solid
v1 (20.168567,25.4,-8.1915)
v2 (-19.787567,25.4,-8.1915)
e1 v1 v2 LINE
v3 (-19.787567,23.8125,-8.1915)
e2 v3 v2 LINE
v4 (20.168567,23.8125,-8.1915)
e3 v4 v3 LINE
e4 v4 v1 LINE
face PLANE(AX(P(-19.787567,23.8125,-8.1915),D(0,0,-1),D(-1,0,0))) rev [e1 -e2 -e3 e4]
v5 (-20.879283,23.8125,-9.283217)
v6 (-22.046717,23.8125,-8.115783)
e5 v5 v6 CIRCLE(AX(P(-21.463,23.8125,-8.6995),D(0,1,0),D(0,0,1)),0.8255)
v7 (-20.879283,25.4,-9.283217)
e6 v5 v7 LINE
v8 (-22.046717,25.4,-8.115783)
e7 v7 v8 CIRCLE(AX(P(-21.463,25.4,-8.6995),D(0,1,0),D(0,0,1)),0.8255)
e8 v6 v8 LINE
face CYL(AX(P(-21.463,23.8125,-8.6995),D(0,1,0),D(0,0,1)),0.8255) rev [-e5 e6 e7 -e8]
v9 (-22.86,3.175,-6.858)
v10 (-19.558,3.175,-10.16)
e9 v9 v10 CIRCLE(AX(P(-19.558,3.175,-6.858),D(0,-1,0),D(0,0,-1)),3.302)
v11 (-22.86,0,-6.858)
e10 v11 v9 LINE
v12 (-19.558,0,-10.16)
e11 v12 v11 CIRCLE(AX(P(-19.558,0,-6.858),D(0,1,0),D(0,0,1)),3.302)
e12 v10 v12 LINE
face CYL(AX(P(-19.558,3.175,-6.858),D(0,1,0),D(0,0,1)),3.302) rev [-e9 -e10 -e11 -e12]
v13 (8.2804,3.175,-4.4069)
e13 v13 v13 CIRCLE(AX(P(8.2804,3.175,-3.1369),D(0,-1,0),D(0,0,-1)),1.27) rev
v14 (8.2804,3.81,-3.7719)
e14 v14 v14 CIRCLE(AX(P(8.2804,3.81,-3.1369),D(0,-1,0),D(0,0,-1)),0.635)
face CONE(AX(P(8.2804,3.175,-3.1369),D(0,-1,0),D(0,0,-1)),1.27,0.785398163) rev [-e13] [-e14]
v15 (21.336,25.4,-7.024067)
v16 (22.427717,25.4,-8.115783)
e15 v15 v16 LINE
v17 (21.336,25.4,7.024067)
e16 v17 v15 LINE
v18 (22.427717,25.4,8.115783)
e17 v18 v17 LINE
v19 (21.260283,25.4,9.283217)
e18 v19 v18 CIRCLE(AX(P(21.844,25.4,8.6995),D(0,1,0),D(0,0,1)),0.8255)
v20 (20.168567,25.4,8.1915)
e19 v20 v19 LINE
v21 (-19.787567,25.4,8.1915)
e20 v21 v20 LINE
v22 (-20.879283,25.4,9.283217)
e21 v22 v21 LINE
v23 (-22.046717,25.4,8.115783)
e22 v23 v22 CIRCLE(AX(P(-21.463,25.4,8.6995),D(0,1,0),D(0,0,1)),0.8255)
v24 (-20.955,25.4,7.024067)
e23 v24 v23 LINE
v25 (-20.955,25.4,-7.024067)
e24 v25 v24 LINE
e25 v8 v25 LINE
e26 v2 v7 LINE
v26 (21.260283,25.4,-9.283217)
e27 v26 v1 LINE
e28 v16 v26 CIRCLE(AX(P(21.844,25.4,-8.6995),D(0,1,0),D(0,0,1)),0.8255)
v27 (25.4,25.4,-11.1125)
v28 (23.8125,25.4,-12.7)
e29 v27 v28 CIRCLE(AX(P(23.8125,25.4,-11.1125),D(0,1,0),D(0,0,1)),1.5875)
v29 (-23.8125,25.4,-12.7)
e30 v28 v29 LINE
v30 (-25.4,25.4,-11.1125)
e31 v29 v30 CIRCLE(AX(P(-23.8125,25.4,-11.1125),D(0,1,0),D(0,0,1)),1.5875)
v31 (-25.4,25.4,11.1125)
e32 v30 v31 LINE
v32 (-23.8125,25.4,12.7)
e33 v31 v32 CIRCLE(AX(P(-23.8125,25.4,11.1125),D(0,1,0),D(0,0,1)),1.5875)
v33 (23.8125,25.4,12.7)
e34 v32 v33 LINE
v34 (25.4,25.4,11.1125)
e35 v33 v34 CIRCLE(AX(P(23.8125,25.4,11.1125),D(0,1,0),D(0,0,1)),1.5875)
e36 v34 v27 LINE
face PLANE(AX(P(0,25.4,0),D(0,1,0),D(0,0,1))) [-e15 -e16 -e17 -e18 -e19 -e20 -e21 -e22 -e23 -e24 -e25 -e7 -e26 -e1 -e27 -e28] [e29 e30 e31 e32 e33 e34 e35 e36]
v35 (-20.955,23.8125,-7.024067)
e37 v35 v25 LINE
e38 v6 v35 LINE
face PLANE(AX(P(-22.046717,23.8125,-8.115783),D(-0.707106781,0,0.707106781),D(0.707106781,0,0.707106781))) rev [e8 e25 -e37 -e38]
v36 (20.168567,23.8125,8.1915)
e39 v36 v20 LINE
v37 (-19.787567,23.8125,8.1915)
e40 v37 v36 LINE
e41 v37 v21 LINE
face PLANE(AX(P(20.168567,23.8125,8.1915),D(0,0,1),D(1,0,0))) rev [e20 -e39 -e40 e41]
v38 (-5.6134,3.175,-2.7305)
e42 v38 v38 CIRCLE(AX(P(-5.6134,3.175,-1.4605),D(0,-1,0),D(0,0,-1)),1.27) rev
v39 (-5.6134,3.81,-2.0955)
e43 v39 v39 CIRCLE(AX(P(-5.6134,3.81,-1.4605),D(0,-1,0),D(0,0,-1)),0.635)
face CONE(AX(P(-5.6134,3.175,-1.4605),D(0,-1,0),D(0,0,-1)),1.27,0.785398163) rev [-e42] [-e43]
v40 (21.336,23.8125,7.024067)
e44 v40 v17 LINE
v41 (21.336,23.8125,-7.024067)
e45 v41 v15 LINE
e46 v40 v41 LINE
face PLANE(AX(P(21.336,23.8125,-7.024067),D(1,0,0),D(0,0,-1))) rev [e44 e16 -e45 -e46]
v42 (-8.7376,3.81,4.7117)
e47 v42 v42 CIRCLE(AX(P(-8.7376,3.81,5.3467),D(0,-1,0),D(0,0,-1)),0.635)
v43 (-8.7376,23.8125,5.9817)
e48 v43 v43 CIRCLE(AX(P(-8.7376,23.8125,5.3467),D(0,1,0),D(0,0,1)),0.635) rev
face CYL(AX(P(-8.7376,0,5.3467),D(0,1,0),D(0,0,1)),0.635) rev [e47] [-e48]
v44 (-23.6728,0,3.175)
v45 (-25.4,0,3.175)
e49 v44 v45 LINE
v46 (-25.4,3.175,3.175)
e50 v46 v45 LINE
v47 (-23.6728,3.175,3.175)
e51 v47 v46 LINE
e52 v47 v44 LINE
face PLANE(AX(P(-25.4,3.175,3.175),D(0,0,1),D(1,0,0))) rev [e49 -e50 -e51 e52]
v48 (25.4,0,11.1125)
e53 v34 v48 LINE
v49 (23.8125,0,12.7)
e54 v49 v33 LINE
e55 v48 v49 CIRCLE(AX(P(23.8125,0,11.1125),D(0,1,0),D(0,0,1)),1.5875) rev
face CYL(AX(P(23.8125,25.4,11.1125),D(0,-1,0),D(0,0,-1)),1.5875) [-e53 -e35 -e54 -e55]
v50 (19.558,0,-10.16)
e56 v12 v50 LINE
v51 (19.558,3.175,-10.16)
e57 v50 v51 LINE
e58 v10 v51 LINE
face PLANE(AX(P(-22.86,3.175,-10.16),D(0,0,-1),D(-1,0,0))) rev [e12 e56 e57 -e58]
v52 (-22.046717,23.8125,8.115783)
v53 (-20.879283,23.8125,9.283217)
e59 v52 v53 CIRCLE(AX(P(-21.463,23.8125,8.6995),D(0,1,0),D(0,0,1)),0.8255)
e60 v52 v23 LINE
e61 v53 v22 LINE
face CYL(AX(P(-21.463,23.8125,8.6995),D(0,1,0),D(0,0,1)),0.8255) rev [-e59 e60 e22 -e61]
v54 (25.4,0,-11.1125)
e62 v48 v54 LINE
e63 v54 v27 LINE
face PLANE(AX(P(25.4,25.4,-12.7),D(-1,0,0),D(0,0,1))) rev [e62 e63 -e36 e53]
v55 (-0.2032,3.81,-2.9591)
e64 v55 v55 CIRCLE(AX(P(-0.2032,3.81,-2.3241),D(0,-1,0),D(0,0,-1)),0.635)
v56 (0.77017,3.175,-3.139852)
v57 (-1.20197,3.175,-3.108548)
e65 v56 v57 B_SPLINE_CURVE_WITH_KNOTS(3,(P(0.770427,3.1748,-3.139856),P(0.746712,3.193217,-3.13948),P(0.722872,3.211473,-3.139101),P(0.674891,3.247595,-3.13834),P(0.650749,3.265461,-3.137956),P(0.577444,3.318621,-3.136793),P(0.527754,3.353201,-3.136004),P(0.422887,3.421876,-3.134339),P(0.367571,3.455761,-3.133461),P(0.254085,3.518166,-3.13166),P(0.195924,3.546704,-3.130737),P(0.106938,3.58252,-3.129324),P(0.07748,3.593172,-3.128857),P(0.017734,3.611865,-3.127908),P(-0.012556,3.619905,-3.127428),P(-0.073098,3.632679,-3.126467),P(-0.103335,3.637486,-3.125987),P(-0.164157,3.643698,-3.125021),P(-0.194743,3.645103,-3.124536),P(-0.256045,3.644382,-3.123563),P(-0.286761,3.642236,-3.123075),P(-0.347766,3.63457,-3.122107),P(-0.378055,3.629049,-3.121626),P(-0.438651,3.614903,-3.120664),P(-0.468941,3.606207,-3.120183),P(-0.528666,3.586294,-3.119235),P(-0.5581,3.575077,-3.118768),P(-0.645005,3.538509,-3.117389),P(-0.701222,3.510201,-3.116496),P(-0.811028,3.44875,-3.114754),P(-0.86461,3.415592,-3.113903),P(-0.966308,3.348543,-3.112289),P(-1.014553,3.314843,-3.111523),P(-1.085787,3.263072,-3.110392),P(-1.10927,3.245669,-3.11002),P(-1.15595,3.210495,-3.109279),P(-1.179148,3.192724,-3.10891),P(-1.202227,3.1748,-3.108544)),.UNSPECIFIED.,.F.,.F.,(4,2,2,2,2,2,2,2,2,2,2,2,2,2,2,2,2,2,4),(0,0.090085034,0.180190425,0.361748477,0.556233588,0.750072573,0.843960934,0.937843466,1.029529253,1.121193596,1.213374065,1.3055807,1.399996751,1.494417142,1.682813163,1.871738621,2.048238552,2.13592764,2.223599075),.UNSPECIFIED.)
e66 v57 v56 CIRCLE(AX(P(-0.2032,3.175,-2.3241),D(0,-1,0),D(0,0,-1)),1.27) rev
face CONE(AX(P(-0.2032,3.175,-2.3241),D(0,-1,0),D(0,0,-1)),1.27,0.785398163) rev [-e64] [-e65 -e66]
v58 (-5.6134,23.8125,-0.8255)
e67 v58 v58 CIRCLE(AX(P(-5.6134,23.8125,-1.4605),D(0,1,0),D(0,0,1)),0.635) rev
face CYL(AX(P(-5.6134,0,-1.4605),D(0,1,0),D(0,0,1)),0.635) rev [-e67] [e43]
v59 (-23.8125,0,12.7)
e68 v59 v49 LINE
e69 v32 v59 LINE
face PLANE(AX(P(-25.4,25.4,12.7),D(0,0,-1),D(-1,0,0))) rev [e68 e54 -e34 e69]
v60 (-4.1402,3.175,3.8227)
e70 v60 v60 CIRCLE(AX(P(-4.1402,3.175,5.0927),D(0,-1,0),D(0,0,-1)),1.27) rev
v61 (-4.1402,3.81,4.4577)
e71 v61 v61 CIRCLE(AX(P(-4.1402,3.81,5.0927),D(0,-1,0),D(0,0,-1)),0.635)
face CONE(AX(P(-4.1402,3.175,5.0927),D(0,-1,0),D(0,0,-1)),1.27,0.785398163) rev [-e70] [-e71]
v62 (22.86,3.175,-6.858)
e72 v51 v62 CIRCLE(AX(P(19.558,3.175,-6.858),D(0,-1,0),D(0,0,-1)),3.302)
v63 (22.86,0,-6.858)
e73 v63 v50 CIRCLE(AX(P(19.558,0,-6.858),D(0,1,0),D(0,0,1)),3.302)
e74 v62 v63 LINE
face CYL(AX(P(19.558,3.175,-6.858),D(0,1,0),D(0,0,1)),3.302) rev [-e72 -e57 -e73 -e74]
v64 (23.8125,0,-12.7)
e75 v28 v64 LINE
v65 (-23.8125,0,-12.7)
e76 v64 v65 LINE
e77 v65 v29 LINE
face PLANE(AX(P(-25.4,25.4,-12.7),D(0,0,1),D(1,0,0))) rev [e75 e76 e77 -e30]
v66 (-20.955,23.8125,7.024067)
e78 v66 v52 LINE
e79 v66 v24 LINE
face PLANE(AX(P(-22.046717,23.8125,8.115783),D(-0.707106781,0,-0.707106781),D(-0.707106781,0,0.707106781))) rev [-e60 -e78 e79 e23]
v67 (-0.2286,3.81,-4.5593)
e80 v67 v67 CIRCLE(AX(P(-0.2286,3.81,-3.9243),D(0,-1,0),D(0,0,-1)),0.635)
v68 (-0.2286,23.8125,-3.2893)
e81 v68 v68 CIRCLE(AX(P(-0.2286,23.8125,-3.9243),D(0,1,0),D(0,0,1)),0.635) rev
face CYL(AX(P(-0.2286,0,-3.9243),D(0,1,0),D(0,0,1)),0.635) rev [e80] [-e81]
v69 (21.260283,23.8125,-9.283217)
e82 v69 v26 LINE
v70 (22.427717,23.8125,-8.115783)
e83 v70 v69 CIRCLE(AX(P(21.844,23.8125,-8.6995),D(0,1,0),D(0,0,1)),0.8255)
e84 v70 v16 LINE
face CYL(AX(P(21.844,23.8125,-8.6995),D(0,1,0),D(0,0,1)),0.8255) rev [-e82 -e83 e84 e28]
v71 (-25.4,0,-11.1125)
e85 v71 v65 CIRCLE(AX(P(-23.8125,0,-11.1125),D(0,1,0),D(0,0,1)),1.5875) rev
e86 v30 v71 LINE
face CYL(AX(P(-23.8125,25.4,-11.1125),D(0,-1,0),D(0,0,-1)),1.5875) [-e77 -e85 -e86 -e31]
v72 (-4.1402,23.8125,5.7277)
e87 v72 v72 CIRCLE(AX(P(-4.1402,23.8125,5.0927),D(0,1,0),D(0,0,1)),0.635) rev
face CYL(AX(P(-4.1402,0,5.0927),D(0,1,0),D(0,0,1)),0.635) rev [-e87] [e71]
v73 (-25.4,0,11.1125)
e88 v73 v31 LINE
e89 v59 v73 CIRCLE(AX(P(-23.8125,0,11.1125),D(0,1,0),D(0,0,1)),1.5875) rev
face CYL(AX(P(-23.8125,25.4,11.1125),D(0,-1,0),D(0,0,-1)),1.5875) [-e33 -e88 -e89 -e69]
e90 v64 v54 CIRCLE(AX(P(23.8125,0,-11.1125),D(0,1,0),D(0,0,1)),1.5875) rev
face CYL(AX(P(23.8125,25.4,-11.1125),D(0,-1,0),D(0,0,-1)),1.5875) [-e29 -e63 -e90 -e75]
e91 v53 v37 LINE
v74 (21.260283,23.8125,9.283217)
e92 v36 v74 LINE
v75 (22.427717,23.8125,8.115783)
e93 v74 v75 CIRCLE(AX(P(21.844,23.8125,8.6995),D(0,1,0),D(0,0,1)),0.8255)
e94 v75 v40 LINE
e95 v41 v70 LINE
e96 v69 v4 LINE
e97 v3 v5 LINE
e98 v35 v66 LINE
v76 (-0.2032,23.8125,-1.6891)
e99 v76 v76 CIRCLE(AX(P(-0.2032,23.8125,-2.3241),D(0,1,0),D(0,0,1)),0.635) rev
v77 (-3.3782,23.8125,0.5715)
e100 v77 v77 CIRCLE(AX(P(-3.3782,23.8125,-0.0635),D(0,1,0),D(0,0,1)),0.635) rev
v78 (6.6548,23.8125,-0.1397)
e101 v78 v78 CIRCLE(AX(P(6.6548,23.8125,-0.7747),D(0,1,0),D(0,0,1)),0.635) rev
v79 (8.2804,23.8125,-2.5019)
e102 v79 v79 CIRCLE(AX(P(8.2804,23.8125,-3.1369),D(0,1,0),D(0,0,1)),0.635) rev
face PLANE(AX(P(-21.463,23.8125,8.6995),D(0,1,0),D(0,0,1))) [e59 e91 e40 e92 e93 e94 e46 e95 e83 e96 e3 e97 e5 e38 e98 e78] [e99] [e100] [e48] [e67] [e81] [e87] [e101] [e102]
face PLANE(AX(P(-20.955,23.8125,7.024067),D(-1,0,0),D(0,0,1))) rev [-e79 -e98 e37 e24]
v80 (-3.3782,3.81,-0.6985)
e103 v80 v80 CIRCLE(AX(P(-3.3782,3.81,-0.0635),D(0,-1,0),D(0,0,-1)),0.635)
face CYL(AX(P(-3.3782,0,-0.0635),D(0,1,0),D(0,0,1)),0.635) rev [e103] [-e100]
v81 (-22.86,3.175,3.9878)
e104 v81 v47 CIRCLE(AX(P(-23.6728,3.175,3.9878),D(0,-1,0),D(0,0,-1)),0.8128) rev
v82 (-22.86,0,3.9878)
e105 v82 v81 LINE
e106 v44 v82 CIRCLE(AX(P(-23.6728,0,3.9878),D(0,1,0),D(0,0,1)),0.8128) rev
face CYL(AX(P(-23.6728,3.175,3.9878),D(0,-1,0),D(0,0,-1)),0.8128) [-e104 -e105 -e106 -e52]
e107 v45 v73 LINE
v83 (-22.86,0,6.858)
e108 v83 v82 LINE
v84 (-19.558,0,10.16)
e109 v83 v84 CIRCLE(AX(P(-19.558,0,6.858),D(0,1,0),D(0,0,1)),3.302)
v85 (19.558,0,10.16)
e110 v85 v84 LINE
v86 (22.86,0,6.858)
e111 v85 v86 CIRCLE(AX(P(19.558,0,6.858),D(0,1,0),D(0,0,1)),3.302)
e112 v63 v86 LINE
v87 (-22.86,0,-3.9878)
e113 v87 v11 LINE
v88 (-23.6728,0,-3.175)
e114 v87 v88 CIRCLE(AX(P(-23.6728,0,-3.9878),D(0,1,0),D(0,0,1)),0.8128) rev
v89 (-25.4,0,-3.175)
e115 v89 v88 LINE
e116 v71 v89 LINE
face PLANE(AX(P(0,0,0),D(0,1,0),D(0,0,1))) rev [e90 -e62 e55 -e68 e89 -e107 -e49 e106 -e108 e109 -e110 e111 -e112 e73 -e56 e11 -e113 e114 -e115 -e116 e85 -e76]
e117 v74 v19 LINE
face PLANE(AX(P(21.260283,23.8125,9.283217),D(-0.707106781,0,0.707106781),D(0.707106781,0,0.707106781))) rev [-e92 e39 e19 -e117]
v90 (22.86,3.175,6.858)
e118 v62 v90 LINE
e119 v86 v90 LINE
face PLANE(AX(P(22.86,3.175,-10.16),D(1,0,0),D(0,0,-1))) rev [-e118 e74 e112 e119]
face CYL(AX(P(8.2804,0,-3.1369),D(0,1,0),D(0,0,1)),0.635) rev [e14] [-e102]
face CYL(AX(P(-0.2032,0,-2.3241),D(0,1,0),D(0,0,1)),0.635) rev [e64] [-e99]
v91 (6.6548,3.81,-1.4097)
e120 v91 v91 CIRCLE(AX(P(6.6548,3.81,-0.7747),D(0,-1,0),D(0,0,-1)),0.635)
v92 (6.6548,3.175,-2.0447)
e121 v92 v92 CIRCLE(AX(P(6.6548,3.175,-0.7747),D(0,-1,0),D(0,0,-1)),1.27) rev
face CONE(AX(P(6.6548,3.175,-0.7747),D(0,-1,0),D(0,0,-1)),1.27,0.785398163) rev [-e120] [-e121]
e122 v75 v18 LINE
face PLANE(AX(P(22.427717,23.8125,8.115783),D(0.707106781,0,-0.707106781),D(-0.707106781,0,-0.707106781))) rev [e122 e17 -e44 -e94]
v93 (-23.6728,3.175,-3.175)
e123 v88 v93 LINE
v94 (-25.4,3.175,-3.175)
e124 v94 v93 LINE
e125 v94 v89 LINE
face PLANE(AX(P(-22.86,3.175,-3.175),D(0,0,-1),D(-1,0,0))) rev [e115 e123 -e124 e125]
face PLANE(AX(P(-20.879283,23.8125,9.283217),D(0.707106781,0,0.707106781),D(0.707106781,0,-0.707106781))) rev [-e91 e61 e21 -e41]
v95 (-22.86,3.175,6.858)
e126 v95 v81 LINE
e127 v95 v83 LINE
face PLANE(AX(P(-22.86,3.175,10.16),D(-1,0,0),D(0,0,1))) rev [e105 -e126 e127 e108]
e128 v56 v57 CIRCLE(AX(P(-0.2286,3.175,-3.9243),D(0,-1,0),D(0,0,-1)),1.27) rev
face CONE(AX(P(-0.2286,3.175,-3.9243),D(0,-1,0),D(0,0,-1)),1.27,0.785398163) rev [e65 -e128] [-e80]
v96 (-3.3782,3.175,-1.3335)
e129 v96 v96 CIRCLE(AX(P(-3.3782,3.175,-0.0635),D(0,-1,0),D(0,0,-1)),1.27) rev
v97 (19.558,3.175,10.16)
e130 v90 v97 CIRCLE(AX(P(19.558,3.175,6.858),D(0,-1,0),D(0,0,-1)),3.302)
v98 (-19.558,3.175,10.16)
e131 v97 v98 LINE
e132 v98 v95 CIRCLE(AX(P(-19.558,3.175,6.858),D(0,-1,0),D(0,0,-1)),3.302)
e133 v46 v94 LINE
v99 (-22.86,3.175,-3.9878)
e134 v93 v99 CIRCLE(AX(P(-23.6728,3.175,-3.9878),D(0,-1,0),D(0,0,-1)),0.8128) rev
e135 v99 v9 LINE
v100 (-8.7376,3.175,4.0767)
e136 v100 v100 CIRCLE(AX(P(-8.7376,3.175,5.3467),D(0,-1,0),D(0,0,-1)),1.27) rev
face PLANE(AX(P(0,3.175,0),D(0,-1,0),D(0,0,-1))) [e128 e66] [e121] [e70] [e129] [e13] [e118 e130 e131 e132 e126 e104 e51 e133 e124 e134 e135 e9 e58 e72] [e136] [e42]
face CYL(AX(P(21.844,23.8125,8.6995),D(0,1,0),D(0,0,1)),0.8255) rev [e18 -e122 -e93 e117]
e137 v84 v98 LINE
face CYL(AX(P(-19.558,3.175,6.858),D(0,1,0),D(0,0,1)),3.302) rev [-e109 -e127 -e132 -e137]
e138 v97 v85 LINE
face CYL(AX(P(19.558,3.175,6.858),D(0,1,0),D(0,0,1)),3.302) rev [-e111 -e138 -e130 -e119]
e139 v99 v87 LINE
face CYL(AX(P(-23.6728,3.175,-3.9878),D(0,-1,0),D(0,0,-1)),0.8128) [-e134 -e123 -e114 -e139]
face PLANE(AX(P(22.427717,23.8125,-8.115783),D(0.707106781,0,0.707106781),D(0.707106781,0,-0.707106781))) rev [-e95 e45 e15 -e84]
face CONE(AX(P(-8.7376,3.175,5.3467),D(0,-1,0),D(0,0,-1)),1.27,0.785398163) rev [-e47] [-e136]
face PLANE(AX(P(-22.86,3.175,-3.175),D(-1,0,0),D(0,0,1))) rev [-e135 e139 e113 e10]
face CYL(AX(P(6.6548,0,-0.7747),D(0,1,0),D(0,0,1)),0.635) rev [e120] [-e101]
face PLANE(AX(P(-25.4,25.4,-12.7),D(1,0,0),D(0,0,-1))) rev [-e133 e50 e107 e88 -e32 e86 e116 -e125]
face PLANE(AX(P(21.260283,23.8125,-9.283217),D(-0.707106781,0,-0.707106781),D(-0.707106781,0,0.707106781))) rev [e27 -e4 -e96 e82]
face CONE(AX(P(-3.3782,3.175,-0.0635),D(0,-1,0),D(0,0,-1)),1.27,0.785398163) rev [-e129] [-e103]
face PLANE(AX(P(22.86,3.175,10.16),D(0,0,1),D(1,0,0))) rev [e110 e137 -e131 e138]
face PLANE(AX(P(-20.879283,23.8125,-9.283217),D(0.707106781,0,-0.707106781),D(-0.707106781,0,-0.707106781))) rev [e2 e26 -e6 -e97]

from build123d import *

# Parameters (mm, degrees)
SKETCH1_W           = 50.8
SKETCH1_H           = 25.4
BOSS_EXTRUDE1_DEPTH = 25.4
SKETCH6_R           = 0.635
CUT_EXTRUDE1_DEPTH  = 39.1
CUT_EXTRUDE2_DEPTH  = 1.5875
CUT_EXTRUDE3_DEPTH  = 3.175
FILLET1_R           = 3.302
FILLET2_R           = 0.8128
CHAMFER1_SIZE       = 0.635
FILLET3_R           = 1.5875


with BuildPart() as part:
    # Sketch1 → Boss-Extrude1 (new body)
    with BuildSketch(Plane(origin=(0, 0, 0), x_dir=(1, 0, 0), z_dir=(0, 1, 0))):
        Rectangle(SKETCH1_W, SKETCH1_H)
    extrude(amount=BOSS_EXTRUDE1_DEPTH)

    # Sketch6 → Cut-Extrude1 (cut, through all)
    with BuildSketch(Plane(origin=(0, 25.4, 0), x_dir=(1, 0, 0), z_dir=(0, 1, 0))):
        with Locations(Location((-5.6134, 1.4605, 0), (0, 0, 270))):
            Circle(SKETCH6_R)
        with Locations(Location((-0.2286, 3.9243, 0), (0, 0, 270))):
            Circle(SKETCH6_R)
        with Locations(Location((-0.2032, 2.3241, 0), (0, 0, 270))):
            Circle(SKETCH6_R)
        with Locations(Location((-4.1402, -5.0927, 0), (0, 0, 270))):
            Circle(SKETCH6_R)
        with Locations(Location((-8.7376, -5.3467, 0), (0, 0, 270))):
            Circle(SKETCH6_R)
        with Locations(Location((6.6548, 0.7747, 0), (0, 0, 270))):
            Circle(SKETCH6_R)
        with Locations(Location((8.2804, 3.1369, 0), (0, 0, 270))):
            Circle(SKETCH6_R)
        with Locations(Location((-3.3782, 0.0635, 0), (0, 0, 270))):
            Circle(SKETCH6_R)
    extrude(amount=-CUT_EXTRUDE1_DEPTH, mode=Mode.SUBTRACT)

    # Sketch7 → Cut-Extrude2 (cut)
    with BuildSketch(Plane(origin=(0, 25.4, 0), x_dir=(1, 0, 0), z_dir=(0, 1, 0))):
        with BuildLine():
            Line((-20.955, -7.024066704), (-20.955, 7.024066704))
            Line((-20.955, 7.024066704), (-22.046716648, 8.115783352))
            ThreePointArc((-22.046716648, 8.115783352), (-22.046716648, 9.283216648), (-20.879283352, 9.283216648))
            Line((-20.879283352, 9.283216648), (-19.787566704, 8.1915))
            Line((-19.787566704, 8.1915), (20.168566704, 8.1915))
            Line((20.168566704, 8.1915), (21.260283352, 9.283216648))
            ThreePointArc((21.260283352, 9.283216648), (22.427716648, 9.283216648), (22.427716648, 8.115783352))
            Line((22.427716648, 8.115783352), (21.336, 7.024066704))
            Line((21.336, 7.024066704), (21.336, -7.024066704))
            Line((21.336, -7.024066704), (22.427716648, -8.115783352))
            ThreePointArc((22.427716648, -8.115783352), (22.427716648, -9.283216648), (21.260283352, -9.283216648))
            Line((21.260283352, -9.283216648), (20.168566704, -8.1915))
            Line((20.168566704, -8.1915), (-19.787566704, -8.1915))
            Line((-19.787566704, -8.1915), (-20.879283352, -9.283216648))
            ThreePointArc((-20.879283352, -9.283216648), (-22.046716648, -9.283216648), (-22.046716648, -8.115783352))
            Line((-22.046716648, -8.115783352), (-20.955, -7.024066704))
        make_face()
    extrude(amount=-CUT_EXTRUDE2_DEPTH, mode=Mode.SUBTRACT)

    # Sketch8 → Cut-Extrude3 (cut)
    with BuildSketch(Plane.XZ):
        Polygon((22.86, 10.16), (-22.86, 10.16), (-22.86, 3.175), (-25.4, 3.175), (-25.4, -3.175), (-22.86, -3.175), (-22.86, -10.16), (22.86, -10.16), align=None)
    extrude(amount=-CUT_EXTRUDE3_DEPTH, mode=Mode.SUBTRACT)

    # Fillet1
    fillet1_edges = [part.edges().sort_by_distance(p)[0] for p in [
        (22.86, 1.5875, 10.16),
        (22.86, 1.5875, -10.16),
        (-22.86, 1.5875, -10.16),
        (-22.86, 1.5875, 10.16),
    ]]
    fillet(fillet1_edges, radius=FILLET1_R)

    # Fillet2
    fillet2_edges = [part.edges().sort_by_distance(p)[0] for p in [
        (-22.86, 1.5875, -3.175),
        (-22.86, 1.5875, 3.175),
    ]]
    fillet(fillet2_edges, radius=FILLET2_R)

    # Chamfer1
    # the kernel refuses this chamfer: 0.635 mm, written as the material it takes off along each edge
    with BuildSketch(Plane(origin=(-5.6134, 3.175, -1.4605), x_dir=(0, 0, 1), z_dir=(-1, 0, 0))) as chamfer1_piece_1:
        Polygon((0.635 + CHAMFER1_SIZE, 0), (0.635, CHAMFER1_SIZE), (0.635, 0), align=None)
    revolve(axis=Axis((-5.6134, 3.175, -1.4605), (0, 1, 0)), mode=Mode.SUBTRACT)
    with BuildSketch(Plane(origin=(-0.2286, 3.175, -3.9243), x_dir=(0, 0, 1), z_dir=(-1, 0, 0))) as chamfer1_piece_2:
        Polygon((0.635 + CHAMFER1_SIZE, 0), (0.635, CHAMFER1_SIZE), (0.635, 0), align=None)
    revolve(axis=Axis((-0.2286, 3.175, -3.9243), (0, 1, 0)), mode=Mode.SUBTRACT)
    with BuildSketch(Plane(origin=(-0.2032, 3.175, -2.3241), x_dir=(0, 0, 1), z_dir=(-1, 0, 0))) as chamfer1_piece_3:
        Polygon((0.635 + CHAMFER1_SIZE, 0), (0.635, CHAMFER1_SIZE), (0.635, 0), align=None)
    revolve(axis=Axis((-0.2032, 3.175, -2.3241), (0, 1, 0)), mode=Mode.SUBTRACT)
    with BuildSketch(Plane(origin=(-4.1402, 3.175, 5.0927), x_dir=(0, 0, 1), z_dir=(-1, 0, 0))) as chamfer1_piece_4:
        Polygon((0.635 + CHAMFER1_SIZE, 0), (0.635, CHAMFER1_SIZE), (0.635, 0), align=None)
    revolve(axis=Axis((-4.1402, 3.175, 5.0927), (0, 1, 0)), mode=Mode.SUBTRACT)
    with BuildSketch(Plane(origin=(-8.7376, 3.175, 5.3467), x_dir=(0, 0, 1), z_dir=(-1, 0, 0))) as chamfer1_piece_5:
        Polygon((0.635 + CHAMFER1_SIZE, 0), (0.635, CHAMFER1_SIZE), (0.635, 0), align=None)
    revolve(axis=Axis((-8.7376, 3.175, 5.3467), (0, 1, 0)), mode=Mode.SUBTRACT)
    with BuildSketch(Plane(origin=(6.6548, 3.175, -0.7747), x_dir=(0, 0, 1), z_dir=(-1, 0, 0))) as chamfer1_piece_6:
        Polygon((0.635 + CHAMFER1_SIZE, 0), (0.635, CHAMFER1_SIZE), (0.635, 0), align=None)
    revolve(axis=Axis((6.6548, 3.175, -0.7747), (0, 1, 0)), mode=Mode.SUBTRACT)
    with BuildSketch(Plane(origin=(8.2804, 3.175, -3.1369), x_dir=(0, 0, 1), z_dir=(-1, 0, 0))) as chamfer1_piece_7:
        Polygon((0.635 + CHAMFER1_SIZE, 0), (0.635, CHAMFER1_SIZE), (0.635, 0), align=None)
    revolve(axis=Axis((8.2804, 3.175, -3.1369), (0, 1, 0)), mode=Mode.SUBTRACT)
    with BuildSketch(Plane(origin=(-3.3782, 3.175, -0.0635), x_dir=(0, 0, 1), z_dir=(-1, 0, 0))) as chamfer1_piece_8:
        Polygon((0.635 + CHAMFER1_SIZE, 0), (0.635, CHAMFER1_SIZE), (0.635, 0), align=None)
    revolve(axis=Axis((-3.3782, 3.175, -0.0635), (0, 1, 0)), mode=Mode.SUBTRACT)

    # Fillet3
    fillet3_edges = [part.edges().sort_by_distance(p)[0] for p in [
        (-25.4, 12.7, -12.7),
        (25.4, 12.7, -12.7),
        (25.4, 12.7, 12.7),
        (-25.4, 12.7, 12.7),
    ]]
    fillet(fillet3_edges, radius=FILLET3_R)


solid = part.part
